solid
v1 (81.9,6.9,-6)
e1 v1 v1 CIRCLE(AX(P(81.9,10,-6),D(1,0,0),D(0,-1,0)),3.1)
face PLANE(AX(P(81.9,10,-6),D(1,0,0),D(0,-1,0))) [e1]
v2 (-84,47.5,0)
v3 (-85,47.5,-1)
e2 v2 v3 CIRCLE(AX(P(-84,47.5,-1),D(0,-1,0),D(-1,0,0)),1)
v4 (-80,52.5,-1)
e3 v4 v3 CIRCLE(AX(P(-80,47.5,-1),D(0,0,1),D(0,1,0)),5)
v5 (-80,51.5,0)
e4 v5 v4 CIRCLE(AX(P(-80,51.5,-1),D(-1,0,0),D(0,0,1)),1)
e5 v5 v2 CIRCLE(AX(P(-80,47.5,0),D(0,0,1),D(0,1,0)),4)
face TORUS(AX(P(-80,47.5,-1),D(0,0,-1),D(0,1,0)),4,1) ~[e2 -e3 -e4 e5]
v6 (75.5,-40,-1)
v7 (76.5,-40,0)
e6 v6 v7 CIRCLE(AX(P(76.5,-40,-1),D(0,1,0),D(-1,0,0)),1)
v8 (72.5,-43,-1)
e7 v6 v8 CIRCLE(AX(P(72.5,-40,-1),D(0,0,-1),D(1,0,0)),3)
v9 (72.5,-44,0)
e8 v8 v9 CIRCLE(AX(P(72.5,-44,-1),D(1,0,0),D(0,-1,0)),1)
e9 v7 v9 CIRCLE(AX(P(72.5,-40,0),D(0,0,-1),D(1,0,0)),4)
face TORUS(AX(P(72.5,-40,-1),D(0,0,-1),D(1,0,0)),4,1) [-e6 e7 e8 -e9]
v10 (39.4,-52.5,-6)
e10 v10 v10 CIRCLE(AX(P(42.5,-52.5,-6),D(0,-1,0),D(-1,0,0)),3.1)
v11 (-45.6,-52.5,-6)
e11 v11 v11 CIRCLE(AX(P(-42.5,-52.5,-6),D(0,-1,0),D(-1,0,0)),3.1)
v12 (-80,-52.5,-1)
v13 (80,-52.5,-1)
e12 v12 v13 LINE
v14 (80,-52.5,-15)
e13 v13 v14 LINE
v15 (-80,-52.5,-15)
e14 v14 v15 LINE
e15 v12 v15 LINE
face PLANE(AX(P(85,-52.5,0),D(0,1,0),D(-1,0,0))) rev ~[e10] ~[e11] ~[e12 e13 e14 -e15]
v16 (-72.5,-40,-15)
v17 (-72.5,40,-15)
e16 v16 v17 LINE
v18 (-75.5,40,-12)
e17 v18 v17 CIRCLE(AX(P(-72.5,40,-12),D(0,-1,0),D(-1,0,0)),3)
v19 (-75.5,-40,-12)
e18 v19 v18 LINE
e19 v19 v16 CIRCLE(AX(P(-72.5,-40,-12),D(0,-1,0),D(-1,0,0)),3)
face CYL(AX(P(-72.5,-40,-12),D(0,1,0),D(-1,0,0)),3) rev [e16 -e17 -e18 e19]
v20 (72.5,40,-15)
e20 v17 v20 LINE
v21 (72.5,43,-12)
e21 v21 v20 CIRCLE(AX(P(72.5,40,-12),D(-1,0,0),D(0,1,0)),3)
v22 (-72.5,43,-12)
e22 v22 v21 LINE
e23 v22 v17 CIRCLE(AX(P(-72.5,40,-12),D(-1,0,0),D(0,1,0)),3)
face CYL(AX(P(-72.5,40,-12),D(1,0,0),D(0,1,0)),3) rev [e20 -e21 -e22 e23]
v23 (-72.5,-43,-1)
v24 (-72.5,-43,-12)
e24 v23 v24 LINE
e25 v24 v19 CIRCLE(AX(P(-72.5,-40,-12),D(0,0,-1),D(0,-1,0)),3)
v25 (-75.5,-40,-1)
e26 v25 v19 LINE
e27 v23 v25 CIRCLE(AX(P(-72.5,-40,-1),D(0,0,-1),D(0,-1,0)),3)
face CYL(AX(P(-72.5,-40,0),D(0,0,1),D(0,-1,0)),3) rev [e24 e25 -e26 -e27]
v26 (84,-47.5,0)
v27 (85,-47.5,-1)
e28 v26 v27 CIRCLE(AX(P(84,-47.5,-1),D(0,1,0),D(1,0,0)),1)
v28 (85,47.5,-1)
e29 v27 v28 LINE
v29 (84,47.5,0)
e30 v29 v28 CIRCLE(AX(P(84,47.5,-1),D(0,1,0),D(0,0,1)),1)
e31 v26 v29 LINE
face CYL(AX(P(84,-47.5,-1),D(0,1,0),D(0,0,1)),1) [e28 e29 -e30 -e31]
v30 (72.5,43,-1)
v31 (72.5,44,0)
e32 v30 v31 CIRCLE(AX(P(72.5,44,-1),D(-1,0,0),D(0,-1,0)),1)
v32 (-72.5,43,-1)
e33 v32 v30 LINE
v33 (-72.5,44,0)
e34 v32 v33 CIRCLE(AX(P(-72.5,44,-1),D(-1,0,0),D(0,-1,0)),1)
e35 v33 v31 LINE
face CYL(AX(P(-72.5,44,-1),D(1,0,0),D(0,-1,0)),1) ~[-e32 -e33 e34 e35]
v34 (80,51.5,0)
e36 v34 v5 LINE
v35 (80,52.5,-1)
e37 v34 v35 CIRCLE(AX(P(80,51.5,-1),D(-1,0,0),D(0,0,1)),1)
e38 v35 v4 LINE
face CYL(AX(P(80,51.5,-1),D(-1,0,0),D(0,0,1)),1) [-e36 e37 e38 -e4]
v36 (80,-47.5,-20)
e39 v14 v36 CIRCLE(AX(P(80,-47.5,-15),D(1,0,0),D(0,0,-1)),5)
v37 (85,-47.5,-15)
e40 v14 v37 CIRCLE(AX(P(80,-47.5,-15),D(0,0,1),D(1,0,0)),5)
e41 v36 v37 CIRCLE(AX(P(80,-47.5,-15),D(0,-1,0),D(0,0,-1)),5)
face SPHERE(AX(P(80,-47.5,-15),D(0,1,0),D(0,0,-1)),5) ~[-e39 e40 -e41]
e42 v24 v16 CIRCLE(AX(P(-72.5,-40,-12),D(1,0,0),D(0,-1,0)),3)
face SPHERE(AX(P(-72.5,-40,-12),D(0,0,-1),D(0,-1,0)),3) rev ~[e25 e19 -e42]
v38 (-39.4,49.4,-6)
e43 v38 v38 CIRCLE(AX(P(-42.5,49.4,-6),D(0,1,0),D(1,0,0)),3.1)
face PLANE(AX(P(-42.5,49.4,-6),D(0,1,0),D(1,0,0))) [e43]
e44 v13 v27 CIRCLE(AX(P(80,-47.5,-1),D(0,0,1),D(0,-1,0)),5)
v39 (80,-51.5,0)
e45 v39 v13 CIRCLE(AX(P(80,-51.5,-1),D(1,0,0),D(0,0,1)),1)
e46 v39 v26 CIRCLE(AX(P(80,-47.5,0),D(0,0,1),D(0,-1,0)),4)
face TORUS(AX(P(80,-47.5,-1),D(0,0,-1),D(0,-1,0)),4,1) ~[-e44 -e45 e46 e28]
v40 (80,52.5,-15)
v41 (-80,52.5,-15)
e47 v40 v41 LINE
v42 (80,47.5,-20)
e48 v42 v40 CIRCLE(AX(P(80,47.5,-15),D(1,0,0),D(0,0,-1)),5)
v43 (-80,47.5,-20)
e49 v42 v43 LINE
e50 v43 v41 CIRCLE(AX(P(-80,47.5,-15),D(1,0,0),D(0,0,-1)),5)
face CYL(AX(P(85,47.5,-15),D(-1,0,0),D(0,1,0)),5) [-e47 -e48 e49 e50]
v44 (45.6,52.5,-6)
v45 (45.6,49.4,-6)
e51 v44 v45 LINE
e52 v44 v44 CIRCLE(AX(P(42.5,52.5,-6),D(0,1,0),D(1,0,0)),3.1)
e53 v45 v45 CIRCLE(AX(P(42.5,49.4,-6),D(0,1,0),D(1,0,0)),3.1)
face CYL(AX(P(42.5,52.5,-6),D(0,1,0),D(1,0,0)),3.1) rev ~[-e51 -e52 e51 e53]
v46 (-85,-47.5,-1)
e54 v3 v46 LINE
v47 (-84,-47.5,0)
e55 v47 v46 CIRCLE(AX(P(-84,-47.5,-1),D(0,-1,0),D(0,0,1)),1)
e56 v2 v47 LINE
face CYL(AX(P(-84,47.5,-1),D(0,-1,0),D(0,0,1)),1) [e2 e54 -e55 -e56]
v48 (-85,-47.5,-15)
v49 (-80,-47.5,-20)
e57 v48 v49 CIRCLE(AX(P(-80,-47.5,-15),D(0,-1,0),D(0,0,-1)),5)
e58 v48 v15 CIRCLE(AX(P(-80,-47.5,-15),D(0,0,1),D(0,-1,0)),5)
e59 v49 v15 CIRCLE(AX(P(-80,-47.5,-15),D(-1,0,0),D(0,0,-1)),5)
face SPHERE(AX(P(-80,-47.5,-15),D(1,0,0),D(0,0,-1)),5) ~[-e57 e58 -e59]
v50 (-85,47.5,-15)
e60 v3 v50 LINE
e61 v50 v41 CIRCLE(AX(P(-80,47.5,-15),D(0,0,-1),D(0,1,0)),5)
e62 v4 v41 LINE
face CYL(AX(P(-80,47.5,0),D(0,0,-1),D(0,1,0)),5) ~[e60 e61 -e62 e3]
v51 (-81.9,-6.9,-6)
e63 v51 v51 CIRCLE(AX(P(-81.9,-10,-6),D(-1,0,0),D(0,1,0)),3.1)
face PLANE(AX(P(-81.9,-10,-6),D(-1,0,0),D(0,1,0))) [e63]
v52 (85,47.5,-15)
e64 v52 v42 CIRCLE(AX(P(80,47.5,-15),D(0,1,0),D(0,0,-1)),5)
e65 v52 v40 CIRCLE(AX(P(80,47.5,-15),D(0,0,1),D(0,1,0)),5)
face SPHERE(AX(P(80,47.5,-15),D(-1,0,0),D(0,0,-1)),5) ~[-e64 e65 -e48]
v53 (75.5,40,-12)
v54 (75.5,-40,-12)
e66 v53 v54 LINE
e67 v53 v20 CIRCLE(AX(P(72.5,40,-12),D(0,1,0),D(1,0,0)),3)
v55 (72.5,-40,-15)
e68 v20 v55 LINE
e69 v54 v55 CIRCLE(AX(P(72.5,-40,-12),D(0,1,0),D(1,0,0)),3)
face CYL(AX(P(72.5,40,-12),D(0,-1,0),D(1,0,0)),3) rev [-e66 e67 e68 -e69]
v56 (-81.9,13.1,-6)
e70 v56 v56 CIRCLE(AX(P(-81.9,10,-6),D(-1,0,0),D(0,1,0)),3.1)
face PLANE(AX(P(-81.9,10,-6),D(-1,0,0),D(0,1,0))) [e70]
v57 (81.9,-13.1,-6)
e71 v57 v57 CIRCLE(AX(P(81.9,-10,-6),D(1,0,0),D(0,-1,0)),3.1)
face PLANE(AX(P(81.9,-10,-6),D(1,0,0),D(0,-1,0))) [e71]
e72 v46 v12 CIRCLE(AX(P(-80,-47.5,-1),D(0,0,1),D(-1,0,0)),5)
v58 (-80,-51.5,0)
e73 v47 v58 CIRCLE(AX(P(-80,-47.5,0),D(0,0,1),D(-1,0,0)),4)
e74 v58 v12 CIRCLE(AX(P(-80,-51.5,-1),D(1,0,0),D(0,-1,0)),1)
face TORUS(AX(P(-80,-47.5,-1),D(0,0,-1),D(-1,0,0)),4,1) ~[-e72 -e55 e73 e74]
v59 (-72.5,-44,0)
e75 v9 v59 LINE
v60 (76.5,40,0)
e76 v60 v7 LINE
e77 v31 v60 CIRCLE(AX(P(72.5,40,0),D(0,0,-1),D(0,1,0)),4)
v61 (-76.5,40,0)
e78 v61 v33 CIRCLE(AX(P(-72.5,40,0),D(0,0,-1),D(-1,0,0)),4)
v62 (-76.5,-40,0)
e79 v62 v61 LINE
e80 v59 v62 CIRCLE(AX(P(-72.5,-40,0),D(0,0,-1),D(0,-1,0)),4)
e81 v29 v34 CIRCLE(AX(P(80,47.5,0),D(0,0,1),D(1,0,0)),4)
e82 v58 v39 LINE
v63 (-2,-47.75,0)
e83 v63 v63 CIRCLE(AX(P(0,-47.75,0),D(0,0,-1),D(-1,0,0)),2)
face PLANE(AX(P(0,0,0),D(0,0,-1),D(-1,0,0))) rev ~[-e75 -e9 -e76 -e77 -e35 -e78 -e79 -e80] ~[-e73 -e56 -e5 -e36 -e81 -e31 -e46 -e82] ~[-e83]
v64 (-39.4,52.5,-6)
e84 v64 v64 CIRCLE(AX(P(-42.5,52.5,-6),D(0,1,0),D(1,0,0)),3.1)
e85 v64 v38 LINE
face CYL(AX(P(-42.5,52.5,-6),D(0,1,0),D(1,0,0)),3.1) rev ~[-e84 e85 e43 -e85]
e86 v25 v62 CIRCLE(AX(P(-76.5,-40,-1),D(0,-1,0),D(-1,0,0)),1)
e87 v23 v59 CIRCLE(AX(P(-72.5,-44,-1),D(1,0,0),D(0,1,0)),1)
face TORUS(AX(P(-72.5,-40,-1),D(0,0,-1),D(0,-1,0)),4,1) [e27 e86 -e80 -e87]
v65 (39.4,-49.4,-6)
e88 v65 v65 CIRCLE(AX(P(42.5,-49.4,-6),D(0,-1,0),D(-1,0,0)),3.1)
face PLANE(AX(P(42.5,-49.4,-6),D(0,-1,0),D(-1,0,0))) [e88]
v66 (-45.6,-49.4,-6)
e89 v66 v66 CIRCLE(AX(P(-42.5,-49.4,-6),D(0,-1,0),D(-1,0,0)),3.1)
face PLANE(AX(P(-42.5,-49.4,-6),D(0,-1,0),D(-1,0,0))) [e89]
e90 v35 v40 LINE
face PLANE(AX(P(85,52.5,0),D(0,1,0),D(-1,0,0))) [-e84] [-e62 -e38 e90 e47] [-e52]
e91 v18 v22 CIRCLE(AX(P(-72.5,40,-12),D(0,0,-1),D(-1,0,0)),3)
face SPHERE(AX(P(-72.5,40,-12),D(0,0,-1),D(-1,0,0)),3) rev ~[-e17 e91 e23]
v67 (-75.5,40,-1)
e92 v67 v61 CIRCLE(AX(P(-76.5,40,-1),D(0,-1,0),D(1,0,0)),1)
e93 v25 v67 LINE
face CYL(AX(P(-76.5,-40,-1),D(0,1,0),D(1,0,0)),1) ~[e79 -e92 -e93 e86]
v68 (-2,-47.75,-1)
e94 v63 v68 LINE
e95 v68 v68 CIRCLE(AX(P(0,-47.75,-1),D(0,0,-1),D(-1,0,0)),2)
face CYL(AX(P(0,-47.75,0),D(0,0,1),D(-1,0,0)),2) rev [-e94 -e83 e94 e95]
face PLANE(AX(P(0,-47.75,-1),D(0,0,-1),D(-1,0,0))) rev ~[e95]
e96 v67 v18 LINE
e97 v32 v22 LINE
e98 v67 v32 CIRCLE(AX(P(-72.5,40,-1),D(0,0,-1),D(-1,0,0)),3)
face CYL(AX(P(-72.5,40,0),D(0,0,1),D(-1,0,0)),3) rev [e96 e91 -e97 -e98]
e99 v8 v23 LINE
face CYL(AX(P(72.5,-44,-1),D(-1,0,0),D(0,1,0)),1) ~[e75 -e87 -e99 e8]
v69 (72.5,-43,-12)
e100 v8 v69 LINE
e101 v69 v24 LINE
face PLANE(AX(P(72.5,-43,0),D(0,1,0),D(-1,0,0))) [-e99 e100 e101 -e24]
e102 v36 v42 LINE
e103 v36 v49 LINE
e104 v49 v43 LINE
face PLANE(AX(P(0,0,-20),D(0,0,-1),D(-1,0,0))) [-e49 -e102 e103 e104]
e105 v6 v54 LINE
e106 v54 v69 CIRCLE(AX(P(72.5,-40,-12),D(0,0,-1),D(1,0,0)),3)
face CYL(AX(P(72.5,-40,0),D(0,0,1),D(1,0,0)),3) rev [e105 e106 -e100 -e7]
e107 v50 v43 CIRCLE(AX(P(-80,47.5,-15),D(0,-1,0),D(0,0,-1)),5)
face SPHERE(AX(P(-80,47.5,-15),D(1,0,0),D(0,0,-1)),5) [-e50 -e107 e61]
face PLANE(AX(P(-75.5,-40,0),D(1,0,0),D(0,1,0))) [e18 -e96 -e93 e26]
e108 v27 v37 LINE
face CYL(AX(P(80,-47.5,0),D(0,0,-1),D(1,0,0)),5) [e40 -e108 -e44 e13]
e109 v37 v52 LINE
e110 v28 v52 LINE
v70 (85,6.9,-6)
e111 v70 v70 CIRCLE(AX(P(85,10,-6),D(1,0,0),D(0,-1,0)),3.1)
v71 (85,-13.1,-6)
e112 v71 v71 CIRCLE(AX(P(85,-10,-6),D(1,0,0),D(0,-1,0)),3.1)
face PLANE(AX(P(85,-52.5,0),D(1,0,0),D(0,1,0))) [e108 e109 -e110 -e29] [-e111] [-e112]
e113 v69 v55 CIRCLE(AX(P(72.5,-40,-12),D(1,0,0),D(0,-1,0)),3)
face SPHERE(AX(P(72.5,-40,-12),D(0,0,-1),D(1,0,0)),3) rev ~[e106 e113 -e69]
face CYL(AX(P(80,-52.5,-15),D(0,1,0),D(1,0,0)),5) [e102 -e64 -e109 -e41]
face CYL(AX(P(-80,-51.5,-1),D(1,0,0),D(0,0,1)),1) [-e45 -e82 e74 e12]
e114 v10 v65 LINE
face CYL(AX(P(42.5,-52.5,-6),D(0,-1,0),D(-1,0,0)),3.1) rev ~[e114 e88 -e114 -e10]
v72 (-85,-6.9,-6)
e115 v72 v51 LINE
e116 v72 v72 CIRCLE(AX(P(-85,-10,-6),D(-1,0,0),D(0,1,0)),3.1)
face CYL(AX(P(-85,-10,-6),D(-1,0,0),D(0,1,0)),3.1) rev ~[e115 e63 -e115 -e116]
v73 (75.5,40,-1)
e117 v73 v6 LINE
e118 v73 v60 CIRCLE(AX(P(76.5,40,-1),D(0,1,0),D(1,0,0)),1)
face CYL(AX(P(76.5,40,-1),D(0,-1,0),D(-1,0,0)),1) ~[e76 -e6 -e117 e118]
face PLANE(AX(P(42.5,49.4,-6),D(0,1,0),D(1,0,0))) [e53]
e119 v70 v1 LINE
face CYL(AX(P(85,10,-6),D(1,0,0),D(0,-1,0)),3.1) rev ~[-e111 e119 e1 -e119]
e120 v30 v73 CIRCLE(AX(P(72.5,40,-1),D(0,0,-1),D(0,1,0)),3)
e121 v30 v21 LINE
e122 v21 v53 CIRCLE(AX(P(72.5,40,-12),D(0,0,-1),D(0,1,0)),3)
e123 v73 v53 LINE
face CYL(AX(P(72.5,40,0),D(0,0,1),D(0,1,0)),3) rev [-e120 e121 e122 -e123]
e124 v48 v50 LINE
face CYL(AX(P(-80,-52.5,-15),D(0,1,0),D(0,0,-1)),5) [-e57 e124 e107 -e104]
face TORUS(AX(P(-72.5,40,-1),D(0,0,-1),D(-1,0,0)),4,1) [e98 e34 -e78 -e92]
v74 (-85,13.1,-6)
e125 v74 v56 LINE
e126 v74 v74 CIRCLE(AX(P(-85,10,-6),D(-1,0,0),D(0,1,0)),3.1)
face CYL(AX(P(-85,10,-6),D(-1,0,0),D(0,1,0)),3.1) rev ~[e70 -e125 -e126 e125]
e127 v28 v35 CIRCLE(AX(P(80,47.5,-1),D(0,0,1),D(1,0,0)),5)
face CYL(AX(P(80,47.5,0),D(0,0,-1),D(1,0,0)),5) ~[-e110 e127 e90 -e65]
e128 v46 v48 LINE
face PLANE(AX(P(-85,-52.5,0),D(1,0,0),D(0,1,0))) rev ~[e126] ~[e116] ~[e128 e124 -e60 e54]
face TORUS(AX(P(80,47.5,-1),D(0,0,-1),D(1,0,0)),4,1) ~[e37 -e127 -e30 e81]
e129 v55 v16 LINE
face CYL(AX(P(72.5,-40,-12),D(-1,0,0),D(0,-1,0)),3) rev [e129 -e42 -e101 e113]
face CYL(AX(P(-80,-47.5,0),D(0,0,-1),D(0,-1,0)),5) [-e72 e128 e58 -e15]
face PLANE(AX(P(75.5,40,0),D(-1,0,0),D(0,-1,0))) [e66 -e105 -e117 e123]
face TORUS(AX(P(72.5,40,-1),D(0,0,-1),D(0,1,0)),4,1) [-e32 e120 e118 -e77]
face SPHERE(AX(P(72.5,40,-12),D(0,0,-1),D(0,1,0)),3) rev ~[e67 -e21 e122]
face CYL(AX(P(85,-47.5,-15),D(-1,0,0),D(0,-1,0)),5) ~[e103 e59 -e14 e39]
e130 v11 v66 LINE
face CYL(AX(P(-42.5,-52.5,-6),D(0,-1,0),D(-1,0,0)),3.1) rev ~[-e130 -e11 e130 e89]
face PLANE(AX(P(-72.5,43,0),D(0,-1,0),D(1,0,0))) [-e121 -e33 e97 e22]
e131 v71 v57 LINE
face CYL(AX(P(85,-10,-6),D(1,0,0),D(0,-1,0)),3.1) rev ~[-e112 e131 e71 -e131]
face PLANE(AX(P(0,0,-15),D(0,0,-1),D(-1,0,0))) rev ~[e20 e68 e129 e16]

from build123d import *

# Parameters (mm, degrees)
F0_W      = 170
F0_H      = 105
F0_R      = 2
F1_DEPTH  = 20
F2_DEPTH  = 15
F3_R      = 5
F4_R      = 3
F5_R      = 1
F6_R      = 3.1
F7_DEPTH  = 3.1
F8_R      = 3.1
F9_DEPTH  = 3.1
F10_R     = 3.1
F11_DEPTH = 3.1
F12_R     = 3.1
F13_DEPTH = 3.1
F14_DEPTH = 1
F15_ANGLE = 180


# Not quite as in the source:
# - a feature names something its author has since deleted; it is built from what else it names


with BuildPart() as f1:
    # F0 (on Top) → F1 (new body)
    with BuildSketch(Plane.XY):
        Rectangle(F0_W, F0_H)
        with Locations((0, -47.75)):
            Circle(F0_R, mode=Mode.SUBTRACT)
        with BuildLine():
            ThreePointArc((-75.5, 40), (-74.6213203436, 42.1213203436), (-72.5, 43))
            Line((-72.5, 43), (72.5, 43))
            ThreePointArc((72.5, 43), (74.6213203436, 42.1213203436), (75.5, 40))
            Line((75.5, 40), (75.5, -40))
            ThreePointArc((75.5, -40), (74.6213203436, -42.1213203436), (72.5, -43))
            Line((72.5, -43), (-72.5, -43))
            ThreePointArc((-72.5, -43), (-74.6213203436, -42.1213203436), (-75.5, -40))
            Line((-75.5, -40), (-75.5, 40))
        make_face(mode=Mode.SUBTRACT)
        with BuildLine():
            Line((72.5, 43), (-72.5, 43))
            ThreePointArc((-72.5, 43), (-74.6213203436, 42.1213203436), (-75.5, 40))
            Line((-75.5, 40), (-75.5, -40))
            ThreePointArc((-75.5, -40), (-74.6213203436, -42.1213203436), (-72.5, -43))
            Line((-72.5, -43), (72.5, -43))
            ThreePointArc((72.5, -43), (74.6213203436, -42.1213203436), (75.5, -40))
            Line((75.5, -40), (75.5, 40))
            ThreePointArc((75.5, 40), (74.6213203436, 42.1213203436), (72.5, 43))
        make_face()
        with Locations((0, -47.75)):
            Circle(F0_R)
    extrude(amount=F1_DEPTH)

    # F0 (on Top) → F2 (cut)
    with BuildSketch(Plane.XY):
        with BuildLine():
            Line((72.5, 43), (-72.5, 43))
            ThreePointArc((-72.5, 43), (-74.6213203436, 42.1213203436), (-75.5, 40))
            Line((-75.5, 40), (-75.5, -40))
            ThreePointArc((-75.5, -40), (-74.6213203436, -42.1213203436), (-72.5, -43))
            Line((-72.5, -43), (72.5, -43))
            ThreePointArc((72.5, -43), (74.6213203436, -42.1213203436), (75.5, -40))
            Line((75.5, -40), (75.5, 40))
            ThreePointArc((75.5, 40), (74.6213203436, 42.1213203436), (72.5, 43))
        make_face()
    extrude(amount=F2_DEPTH, mode=Mode.SUBTRACT)

    # F3
    f3_edges = [f1.edges().sort_by_distance(p)[0] for p in [
        (0, 52.5, 20),
        (-85, 0, 20),
        (0, -52.5, 20),
        (85, 0, 20),
        (85, 52.5, 10),
        (-85, 52.5, 10),
        (-85, -52.5, 10),
        (85, -52.5, 10),
    ]]
    fillet(f3_edges, radius=F3_R)

    # F4
    f4_edges = [f1.edges().sort_by_distance(p)[0] for p in [
        (0, 43, 15),
        (-74.62132, 42.12132, 15),
        (-75.5, 0, 15),
        (-74.62132, -42.12132, 15),
        (0, -43, 15),
        (74.62132, -42.12132, 15),
        (75.5, 0, 15),
        (74.62132, 42.12132, 15),
    ]]
    fillet(f4_edges, radius=F4_R)

    # F5
    f5_edges = [f1.edges().sort_by_distance(p)[0] for p in [
        (0, 52.5, 0),
        (83.535534, 51.035534, 0),
        (-83.535534, 51.035534, 0),
        (85, 0, 0),
        (-85, 0, 0),
        (83.535534, -51.035534, 0),
        (-83.535534, -51.035534, 0),
        (0, -52.5, 0),
        (0, 43, 0),
        (-74.62132, 42.12132, 0),
        (-75.5, 0, 0),
        (-74.62132, -42.12132, 0),
        (0, -43, 0),
        (74.62132, -42.12132, 0),
        (75.5, 0, 0),
        (74.62132, 42.12132, 0),
    ]]
    fillet(f5_edges, radius=F5_R)

    # F6 (on face) → F7 (cut)
    with BuildSketch(Plane.XZ.offset(52.5)):
        with Locations((42.5, 6)):
            Circle(F6_R)
        with Locations((-42.5, 6)):
            Circle(F6_R)
    extrude(amount=-F7_DEPTH, mode=Mode.SUBTRACT)

    # F8 (on face) → F9 (cut)
    with BuildSketch(Plane(origin=(0, 52.5, 0), x_dir=(-1, 0, 0), z_dir=(0, 1, 0))):
        with Locations((42.5, 6)):
            Circle(F8_R)
        with Locations((-42.5, 6)):
            Circle(F8_R)
    extrude(amount=-F9_DEPTH, mode=Mode.SUBTRACT)

    # F10 (on face) → F11 (cut)
    with BuildSketch(Plane(origin=(-85, 0, 0), x_dir=(0, -1, 0), z_dir=(-1, 0, 0))):
        with Locations((10, 6)):
            Circle(F10_R)
        with Locations((-10, 6)):
            Circle(F10_R)
    extrude(amount=-F11_DEPTH, mode=Mode.SUBTRACT)

    # F12 (on face) → F13 (cut)
    with BuildSketch(Plane.YZ.offset(85)):
        with Locations((10, 6)):
            Circle(F12_R)
        with Locations((-10, 6)):
            Circle(F12_R)
    extrude(amount=-F13_DEPTH, mode=Mode.SUBTRACT)

    # F0 (on Top) → F14 (cut)
    with BuildSketch(Plane.XY):
        with Locations((0, -47.75)):
            Circle(F0_R)
    extrude(amount=F14_DEPTH, mode=Mode.SUBTRACT)


with BuildPart() as f1_1:
    # F15: moved
    add(f1.part.rotate(Axis((0, 0, 0), (0, 1, 0)), F15_ANGLE))


solid = f1_1.part
